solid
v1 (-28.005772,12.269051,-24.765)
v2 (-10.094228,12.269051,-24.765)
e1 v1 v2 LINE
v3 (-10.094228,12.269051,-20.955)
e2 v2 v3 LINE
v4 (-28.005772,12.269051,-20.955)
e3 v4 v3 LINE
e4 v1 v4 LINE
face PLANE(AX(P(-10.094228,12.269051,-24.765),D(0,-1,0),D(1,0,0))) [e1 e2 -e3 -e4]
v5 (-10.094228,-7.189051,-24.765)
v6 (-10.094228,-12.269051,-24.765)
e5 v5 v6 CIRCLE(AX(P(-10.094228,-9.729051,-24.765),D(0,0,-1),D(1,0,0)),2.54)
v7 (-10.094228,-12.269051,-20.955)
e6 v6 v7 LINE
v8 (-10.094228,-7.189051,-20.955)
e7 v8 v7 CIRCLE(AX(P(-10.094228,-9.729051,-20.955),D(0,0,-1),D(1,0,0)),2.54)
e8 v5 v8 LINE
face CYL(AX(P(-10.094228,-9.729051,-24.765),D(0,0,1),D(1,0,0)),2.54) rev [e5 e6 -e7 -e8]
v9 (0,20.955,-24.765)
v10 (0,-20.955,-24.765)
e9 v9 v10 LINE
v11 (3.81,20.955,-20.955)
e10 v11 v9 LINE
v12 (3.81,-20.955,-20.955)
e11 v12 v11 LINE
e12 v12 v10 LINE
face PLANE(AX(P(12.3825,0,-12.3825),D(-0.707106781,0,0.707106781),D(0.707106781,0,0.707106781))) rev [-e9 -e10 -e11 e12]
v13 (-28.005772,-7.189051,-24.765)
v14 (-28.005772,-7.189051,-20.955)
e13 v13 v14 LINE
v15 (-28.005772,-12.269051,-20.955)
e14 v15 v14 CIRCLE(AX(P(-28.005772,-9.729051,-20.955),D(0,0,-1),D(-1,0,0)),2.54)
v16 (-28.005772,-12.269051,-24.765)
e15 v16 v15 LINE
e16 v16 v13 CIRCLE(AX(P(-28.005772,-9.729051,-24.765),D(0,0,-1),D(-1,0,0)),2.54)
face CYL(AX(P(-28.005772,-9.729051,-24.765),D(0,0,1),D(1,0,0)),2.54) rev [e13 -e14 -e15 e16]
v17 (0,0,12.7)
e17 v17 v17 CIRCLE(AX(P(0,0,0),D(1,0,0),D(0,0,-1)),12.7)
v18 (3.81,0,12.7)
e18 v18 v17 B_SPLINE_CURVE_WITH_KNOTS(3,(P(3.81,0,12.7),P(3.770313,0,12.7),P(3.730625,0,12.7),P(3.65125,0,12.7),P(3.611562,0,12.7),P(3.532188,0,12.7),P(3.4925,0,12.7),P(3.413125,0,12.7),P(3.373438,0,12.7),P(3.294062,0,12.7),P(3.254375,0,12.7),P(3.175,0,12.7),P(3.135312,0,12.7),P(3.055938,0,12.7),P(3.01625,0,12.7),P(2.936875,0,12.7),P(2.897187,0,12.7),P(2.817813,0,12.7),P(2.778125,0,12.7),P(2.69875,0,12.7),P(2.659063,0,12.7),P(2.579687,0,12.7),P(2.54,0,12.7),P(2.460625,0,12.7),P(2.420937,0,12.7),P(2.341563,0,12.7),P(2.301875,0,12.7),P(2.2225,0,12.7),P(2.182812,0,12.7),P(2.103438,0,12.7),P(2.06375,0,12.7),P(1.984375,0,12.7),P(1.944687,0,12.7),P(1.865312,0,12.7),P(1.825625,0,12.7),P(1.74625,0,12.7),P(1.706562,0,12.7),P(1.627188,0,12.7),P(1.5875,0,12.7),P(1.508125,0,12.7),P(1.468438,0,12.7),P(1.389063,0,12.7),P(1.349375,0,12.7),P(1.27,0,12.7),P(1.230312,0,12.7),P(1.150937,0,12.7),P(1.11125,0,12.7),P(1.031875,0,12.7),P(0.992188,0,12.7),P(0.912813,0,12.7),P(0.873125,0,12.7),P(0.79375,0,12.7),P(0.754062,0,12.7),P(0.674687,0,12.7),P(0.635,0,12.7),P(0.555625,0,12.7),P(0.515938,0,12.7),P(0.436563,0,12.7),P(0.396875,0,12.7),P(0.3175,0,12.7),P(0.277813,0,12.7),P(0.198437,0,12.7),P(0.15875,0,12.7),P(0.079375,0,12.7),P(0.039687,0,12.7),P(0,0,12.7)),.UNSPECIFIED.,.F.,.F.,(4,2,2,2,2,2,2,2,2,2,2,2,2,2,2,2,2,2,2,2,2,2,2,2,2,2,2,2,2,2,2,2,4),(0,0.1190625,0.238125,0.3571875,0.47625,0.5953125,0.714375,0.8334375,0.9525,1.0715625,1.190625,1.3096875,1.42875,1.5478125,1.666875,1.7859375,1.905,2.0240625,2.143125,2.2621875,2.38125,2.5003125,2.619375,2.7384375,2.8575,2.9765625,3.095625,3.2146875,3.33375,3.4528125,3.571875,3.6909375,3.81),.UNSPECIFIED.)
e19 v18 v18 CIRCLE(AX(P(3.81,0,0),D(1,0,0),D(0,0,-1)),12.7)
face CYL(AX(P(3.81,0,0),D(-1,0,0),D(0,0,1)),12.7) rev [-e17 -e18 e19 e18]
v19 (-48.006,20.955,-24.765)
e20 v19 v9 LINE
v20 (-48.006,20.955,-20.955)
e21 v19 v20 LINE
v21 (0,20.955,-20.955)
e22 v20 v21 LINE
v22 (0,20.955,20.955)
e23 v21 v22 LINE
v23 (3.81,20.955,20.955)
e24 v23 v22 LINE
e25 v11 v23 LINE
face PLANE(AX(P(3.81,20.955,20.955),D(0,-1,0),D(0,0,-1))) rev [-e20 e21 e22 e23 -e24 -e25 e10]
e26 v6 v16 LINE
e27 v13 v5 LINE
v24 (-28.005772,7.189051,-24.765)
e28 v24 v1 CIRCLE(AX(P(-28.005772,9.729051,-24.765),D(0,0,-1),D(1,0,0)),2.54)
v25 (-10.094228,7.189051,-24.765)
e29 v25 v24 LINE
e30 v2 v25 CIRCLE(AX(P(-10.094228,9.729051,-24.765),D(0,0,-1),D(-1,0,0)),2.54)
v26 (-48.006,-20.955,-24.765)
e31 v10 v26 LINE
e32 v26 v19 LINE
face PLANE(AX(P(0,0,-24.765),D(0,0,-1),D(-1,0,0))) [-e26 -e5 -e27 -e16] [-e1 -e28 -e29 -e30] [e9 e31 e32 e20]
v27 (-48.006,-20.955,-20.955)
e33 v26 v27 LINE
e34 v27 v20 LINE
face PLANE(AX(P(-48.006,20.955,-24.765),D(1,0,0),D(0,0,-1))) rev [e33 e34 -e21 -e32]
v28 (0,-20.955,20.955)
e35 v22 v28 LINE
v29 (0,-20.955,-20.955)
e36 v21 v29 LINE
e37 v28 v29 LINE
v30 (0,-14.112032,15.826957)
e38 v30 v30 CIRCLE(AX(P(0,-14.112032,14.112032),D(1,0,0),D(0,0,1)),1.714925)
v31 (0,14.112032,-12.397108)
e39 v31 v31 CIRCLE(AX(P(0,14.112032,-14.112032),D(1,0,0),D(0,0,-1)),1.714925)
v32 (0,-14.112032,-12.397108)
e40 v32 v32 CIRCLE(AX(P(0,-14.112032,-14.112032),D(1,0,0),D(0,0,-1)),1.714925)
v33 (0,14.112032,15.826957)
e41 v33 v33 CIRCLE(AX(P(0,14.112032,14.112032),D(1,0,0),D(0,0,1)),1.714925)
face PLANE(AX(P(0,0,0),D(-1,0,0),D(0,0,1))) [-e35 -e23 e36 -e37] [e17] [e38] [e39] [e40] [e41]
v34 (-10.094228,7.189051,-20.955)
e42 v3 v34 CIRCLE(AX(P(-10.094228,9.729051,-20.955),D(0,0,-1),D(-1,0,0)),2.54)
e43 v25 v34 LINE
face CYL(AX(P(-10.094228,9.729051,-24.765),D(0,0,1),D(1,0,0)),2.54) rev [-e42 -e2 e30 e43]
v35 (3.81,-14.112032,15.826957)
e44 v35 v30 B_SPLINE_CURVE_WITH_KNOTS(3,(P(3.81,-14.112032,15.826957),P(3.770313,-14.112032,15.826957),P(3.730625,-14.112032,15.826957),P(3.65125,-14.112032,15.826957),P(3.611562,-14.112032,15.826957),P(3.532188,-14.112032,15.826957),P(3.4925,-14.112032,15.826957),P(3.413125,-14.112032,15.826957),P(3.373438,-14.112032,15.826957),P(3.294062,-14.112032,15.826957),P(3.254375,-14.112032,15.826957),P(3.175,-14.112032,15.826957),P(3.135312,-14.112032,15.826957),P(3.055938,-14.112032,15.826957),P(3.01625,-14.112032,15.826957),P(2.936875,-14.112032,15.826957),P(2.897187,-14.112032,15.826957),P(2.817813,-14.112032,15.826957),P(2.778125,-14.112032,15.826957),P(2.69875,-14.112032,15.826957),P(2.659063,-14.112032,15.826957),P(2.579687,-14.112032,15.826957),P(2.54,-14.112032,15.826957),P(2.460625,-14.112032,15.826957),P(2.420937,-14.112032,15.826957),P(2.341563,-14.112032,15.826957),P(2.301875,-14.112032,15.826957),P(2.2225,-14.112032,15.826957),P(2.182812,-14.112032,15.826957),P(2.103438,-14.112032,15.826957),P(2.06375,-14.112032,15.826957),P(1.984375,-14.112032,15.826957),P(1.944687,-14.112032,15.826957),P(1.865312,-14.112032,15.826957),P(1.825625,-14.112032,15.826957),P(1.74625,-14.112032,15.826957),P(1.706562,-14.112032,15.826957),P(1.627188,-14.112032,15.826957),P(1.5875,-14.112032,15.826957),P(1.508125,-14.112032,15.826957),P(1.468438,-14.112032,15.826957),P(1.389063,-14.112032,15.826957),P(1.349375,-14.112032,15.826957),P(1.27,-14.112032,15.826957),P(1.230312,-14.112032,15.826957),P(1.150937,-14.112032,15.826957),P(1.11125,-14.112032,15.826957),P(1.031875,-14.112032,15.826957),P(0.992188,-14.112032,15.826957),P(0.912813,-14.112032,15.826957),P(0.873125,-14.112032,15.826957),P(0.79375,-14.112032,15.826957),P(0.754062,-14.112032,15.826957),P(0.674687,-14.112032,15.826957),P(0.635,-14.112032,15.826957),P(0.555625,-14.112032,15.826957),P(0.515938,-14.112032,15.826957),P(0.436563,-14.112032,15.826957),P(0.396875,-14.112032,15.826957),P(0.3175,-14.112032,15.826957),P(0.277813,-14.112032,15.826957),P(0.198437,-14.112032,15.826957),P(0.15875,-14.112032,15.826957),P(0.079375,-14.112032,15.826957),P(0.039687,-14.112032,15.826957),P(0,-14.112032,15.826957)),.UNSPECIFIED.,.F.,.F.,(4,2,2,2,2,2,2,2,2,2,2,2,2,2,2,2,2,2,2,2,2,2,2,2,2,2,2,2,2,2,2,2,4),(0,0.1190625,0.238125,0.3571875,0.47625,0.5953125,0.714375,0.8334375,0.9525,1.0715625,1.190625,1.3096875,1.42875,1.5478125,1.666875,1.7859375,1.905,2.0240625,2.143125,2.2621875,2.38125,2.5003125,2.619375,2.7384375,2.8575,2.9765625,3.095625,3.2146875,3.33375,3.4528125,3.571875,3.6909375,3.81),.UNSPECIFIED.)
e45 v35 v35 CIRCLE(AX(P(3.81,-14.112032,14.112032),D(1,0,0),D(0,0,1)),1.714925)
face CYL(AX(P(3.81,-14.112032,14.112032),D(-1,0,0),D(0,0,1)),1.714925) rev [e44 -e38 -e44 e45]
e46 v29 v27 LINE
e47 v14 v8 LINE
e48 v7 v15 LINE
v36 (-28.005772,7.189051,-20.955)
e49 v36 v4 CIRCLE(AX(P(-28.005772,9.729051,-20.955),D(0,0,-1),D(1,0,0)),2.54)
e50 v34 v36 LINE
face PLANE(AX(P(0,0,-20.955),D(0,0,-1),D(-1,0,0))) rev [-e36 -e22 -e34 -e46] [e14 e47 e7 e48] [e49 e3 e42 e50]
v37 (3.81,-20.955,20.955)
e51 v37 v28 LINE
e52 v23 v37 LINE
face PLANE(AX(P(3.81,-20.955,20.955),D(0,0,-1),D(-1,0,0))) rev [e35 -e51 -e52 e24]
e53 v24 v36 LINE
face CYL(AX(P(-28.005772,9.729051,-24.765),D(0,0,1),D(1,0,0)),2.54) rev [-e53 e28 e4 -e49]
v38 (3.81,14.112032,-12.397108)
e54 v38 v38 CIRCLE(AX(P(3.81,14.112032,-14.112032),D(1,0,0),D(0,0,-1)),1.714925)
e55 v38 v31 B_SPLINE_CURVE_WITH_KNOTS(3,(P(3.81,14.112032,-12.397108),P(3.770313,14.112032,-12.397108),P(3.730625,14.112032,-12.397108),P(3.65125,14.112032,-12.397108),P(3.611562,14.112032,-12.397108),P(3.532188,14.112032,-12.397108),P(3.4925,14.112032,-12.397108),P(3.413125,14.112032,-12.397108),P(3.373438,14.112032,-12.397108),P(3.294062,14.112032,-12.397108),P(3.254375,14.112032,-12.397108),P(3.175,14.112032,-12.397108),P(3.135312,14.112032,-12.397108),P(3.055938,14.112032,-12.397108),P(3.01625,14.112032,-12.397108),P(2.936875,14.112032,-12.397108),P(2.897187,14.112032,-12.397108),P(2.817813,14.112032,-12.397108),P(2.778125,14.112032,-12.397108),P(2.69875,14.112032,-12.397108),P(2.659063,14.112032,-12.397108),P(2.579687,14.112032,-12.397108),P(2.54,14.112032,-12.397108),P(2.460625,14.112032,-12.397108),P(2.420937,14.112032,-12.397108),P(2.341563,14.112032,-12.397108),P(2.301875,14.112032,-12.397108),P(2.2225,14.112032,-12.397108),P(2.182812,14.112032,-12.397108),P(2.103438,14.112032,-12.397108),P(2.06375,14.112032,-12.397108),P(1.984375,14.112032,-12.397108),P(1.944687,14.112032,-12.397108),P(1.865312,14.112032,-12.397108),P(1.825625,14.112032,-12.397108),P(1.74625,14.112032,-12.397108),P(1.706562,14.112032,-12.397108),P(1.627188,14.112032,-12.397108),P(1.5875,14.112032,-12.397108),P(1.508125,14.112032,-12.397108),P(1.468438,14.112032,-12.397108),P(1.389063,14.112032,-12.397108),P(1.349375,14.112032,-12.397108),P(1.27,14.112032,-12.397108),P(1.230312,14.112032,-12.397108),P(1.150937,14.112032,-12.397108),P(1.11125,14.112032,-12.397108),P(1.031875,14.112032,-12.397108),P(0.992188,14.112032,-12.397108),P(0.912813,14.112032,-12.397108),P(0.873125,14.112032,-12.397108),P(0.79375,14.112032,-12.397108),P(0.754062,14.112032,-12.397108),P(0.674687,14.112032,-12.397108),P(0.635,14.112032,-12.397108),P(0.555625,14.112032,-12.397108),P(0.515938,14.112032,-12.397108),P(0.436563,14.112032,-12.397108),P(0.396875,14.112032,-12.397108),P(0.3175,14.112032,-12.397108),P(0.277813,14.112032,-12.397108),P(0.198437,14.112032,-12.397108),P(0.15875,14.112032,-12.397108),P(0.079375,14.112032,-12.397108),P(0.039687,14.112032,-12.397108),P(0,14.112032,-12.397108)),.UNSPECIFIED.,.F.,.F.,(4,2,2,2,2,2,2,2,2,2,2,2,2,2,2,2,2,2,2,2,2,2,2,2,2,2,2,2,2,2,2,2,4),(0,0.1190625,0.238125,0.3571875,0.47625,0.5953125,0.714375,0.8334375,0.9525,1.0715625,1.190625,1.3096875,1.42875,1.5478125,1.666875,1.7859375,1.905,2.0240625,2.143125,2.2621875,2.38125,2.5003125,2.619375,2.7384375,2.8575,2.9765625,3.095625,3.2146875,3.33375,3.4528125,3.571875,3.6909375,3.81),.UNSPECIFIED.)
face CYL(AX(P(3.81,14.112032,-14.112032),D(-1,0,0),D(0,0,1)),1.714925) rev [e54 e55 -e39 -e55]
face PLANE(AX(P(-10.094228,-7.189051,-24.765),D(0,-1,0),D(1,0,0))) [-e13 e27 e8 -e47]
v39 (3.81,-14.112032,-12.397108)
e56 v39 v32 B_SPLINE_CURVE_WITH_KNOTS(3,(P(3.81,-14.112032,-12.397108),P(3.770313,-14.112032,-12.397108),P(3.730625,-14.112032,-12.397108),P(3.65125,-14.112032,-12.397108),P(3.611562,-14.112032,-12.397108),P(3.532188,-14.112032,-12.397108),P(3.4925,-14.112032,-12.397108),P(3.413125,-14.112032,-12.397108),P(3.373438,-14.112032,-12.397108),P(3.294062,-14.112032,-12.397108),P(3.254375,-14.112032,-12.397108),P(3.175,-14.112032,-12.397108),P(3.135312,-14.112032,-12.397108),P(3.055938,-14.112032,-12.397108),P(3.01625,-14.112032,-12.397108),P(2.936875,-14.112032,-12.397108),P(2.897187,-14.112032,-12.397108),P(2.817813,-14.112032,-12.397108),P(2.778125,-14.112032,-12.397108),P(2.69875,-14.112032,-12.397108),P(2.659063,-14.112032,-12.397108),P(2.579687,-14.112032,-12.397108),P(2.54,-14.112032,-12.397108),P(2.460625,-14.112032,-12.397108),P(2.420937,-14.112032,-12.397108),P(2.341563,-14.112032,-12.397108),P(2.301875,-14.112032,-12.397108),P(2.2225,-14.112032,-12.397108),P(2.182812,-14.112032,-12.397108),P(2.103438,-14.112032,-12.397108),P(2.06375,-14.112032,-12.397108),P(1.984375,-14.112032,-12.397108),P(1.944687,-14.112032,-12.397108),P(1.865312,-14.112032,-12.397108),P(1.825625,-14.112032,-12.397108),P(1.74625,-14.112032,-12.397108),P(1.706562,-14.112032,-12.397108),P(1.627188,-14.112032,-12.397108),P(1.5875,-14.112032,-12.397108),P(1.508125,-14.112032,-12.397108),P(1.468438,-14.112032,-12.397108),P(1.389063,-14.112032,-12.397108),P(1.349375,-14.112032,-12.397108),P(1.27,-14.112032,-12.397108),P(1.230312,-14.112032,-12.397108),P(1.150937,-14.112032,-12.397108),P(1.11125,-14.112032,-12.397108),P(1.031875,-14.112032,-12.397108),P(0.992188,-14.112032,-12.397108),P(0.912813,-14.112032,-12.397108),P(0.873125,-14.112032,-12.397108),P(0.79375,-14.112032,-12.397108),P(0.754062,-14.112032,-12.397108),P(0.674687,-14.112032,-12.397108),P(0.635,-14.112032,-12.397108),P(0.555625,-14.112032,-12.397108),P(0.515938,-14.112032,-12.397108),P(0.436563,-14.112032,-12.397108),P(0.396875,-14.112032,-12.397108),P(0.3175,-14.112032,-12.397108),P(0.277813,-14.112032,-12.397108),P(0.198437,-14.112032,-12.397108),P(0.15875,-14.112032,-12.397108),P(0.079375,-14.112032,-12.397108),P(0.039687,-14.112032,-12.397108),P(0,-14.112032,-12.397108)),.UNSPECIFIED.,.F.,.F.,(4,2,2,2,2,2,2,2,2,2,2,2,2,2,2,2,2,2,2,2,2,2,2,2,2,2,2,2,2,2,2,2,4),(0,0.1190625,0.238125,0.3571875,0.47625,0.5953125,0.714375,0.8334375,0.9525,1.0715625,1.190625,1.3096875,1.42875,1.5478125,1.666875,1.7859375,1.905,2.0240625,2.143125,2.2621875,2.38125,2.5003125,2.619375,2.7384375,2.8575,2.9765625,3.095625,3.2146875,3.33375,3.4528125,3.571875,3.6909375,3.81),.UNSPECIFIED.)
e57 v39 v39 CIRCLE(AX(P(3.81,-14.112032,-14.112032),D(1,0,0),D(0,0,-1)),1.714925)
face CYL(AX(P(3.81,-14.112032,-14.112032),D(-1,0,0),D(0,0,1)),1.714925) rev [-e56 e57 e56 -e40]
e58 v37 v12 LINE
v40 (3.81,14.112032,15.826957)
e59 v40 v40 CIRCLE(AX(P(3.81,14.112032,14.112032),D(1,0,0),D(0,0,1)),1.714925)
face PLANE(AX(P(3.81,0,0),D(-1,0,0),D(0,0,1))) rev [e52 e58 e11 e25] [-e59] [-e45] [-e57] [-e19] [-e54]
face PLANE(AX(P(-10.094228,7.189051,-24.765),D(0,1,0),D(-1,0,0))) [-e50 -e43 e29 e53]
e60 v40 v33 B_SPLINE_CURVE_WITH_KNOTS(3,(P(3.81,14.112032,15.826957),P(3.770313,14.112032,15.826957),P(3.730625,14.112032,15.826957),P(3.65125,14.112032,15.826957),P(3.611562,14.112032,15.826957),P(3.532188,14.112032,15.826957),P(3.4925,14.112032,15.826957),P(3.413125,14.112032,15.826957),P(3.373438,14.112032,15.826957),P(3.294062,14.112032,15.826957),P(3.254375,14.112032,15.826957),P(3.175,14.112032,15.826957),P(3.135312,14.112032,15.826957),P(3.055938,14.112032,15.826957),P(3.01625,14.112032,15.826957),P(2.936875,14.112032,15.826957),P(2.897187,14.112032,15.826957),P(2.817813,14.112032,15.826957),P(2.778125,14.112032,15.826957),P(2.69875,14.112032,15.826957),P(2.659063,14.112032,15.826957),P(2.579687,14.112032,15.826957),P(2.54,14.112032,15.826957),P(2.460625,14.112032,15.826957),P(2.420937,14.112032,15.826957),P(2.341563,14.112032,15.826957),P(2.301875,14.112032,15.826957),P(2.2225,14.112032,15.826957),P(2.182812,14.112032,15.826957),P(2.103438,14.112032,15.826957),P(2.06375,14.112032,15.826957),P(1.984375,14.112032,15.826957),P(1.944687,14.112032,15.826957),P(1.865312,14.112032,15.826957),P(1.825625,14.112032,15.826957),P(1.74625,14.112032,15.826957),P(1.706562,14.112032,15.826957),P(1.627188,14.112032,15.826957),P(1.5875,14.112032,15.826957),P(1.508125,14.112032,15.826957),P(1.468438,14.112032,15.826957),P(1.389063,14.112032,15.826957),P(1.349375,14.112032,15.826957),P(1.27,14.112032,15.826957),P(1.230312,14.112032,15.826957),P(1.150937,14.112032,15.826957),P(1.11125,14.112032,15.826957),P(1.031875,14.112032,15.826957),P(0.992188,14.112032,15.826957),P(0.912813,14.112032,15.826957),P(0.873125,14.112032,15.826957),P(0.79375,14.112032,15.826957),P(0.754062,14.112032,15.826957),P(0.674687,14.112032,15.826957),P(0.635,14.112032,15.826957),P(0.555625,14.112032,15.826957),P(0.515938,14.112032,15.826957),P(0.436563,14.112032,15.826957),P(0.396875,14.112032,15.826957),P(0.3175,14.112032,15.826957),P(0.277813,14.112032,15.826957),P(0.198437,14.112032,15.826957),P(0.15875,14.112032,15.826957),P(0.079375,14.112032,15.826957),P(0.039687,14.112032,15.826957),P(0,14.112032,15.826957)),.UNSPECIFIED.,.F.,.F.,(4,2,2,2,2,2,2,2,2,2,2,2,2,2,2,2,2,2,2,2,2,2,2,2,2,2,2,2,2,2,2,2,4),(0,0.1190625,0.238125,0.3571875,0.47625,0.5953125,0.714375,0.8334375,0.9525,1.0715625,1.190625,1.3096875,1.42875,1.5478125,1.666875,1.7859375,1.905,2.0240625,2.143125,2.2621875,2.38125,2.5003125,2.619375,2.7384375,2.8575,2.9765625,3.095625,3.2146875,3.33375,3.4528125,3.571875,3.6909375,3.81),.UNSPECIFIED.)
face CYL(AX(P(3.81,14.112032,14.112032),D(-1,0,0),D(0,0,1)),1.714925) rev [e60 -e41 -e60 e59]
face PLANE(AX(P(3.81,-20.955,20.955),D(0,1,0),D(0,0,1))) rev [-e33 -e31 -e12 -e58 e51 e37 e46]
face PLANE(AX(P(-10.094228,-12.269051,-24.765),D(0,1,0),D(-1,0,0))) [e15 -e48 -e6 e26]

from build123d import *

# Parameters (mm, degrees)
SKETCH1_W           = 41.91
SKETCH1_H           = 41.91
SKETCH1_R           = 12.7
SKETCH1_R_2         = 1.714924581
BOSS_EXTRUDE1_DEPTH = 3.81
SKETCH2_W           = 48.006
SKETCH2_H           = 41.91
BOSS_EXTRUDE2_DEPTH = 3.81
LOFT1_START         = -20.955
LOFT1_DEPTH         = 41.91


# Read off the part's stored shape, not the designer's step: Loft1
with BuildPart() as part:
    # Sketch1 → Boss-Extrude1 (new body)
    with BuildSketch(Plane(origin=(0, 0, 0), x_dir=(0, 0, -1), z_dir=(1, 0, 0))):
        Rectangle(SKETCH1_W, SKETCH1_H)
        with Locations(Location((0, 0, 0), (0, 0, 180))):
            Circle(SKETCH1_R, mode=Mode.SUBTRACT)
        with Locations(Location((14.112032399, 14.112032399, 0), (0, 0, 180))):
            Circle(SKETCH1_R_2, mode=Mode.SUBTRACT)
        with Locations(Location((-14.112032399, -14.112032399, 0), (0, 0, 180))):
            Circle(SKETCH1_R_2, mode=Mode.SUBTRACT)
        with Locations(Location((-14.112032399, 14.112032399, 0), (0, 0, 180))):
            Circle(SKETCH1_R_2, mode=Mode.SUBTRACT)
        with Locations(Location((14.112032399, -14.112032399, 0), (0, 0, 180))):
            Circle(SKETCH1_R_2, mode=Mode.SUBTRACT)
    extrude(amount=BOSS_EXTRUDE1_DEPTH)



with BuildPart() as body_2:
    # Sketch2 → Boss-Extrude2 (new body)
    with BuildSketch(Plane(origin=(0, 0, -20.955), x_dir=(-1, 0, 0), z_dir=(0, 0, -1))):
        with Locations((24.003, 0)):
            Rectangle(SKETCH2_W, SKETCH2_H)
        with BuildLine():
            Line((10.094228129, 7.189050974), (28.005771871, 7.189050974))
            ThreePointArc((28.005771871, 7.189050974), (30.545771871, 9.729050974), (28.005771871, 12.269050974))
            Line((28.005771871, 12.269050974), (10.094228129, 12.269050974))
            ThreePointArc((10.094228129, 12.269050974), (7.554228129, 9.729050974), (10.094228129, 7.189050974))
        make_face(mode=Mode.SUBTRACT)
        with BuildLine():
            Line((10.094228129, -7.189050974), (28.005771871, -7.189050974))
            ThreePointArc((28.005771871, -7.189050974), (30.545771871, -9.729050974), (28.005771871, -12.269050974))
            Line((28.005771871, -12.269050974), (10.094228129, -12.269050974))
            ThreePointArc((10.094228129, -12.269050974), (7.554228129, -9.729050974), (10.094228129, -7.189050974))
        make_face(mode=Mode.SUBTRACT)
    extrude(amount=BOSS_EXTRUDE2_DEPTH)


with BuildPart() as part_1:
    add(part.part)

    add(body_2.part)  # Loft1 merges body 2
    # Loft1 outline → Loft1 (add)
    with BuildSketch(Plane(origin=(0, 0, 0), x_dir=(1, 0, 0), z_dir=(0, 1, 0)).offset(LOFT1_START)):
        Polygon((3.81, 20.955), (0, 24.765), (0, 20.955), align=None)
    extrude(amount=LOFT1_DEPTH)


solid = part_1.part
